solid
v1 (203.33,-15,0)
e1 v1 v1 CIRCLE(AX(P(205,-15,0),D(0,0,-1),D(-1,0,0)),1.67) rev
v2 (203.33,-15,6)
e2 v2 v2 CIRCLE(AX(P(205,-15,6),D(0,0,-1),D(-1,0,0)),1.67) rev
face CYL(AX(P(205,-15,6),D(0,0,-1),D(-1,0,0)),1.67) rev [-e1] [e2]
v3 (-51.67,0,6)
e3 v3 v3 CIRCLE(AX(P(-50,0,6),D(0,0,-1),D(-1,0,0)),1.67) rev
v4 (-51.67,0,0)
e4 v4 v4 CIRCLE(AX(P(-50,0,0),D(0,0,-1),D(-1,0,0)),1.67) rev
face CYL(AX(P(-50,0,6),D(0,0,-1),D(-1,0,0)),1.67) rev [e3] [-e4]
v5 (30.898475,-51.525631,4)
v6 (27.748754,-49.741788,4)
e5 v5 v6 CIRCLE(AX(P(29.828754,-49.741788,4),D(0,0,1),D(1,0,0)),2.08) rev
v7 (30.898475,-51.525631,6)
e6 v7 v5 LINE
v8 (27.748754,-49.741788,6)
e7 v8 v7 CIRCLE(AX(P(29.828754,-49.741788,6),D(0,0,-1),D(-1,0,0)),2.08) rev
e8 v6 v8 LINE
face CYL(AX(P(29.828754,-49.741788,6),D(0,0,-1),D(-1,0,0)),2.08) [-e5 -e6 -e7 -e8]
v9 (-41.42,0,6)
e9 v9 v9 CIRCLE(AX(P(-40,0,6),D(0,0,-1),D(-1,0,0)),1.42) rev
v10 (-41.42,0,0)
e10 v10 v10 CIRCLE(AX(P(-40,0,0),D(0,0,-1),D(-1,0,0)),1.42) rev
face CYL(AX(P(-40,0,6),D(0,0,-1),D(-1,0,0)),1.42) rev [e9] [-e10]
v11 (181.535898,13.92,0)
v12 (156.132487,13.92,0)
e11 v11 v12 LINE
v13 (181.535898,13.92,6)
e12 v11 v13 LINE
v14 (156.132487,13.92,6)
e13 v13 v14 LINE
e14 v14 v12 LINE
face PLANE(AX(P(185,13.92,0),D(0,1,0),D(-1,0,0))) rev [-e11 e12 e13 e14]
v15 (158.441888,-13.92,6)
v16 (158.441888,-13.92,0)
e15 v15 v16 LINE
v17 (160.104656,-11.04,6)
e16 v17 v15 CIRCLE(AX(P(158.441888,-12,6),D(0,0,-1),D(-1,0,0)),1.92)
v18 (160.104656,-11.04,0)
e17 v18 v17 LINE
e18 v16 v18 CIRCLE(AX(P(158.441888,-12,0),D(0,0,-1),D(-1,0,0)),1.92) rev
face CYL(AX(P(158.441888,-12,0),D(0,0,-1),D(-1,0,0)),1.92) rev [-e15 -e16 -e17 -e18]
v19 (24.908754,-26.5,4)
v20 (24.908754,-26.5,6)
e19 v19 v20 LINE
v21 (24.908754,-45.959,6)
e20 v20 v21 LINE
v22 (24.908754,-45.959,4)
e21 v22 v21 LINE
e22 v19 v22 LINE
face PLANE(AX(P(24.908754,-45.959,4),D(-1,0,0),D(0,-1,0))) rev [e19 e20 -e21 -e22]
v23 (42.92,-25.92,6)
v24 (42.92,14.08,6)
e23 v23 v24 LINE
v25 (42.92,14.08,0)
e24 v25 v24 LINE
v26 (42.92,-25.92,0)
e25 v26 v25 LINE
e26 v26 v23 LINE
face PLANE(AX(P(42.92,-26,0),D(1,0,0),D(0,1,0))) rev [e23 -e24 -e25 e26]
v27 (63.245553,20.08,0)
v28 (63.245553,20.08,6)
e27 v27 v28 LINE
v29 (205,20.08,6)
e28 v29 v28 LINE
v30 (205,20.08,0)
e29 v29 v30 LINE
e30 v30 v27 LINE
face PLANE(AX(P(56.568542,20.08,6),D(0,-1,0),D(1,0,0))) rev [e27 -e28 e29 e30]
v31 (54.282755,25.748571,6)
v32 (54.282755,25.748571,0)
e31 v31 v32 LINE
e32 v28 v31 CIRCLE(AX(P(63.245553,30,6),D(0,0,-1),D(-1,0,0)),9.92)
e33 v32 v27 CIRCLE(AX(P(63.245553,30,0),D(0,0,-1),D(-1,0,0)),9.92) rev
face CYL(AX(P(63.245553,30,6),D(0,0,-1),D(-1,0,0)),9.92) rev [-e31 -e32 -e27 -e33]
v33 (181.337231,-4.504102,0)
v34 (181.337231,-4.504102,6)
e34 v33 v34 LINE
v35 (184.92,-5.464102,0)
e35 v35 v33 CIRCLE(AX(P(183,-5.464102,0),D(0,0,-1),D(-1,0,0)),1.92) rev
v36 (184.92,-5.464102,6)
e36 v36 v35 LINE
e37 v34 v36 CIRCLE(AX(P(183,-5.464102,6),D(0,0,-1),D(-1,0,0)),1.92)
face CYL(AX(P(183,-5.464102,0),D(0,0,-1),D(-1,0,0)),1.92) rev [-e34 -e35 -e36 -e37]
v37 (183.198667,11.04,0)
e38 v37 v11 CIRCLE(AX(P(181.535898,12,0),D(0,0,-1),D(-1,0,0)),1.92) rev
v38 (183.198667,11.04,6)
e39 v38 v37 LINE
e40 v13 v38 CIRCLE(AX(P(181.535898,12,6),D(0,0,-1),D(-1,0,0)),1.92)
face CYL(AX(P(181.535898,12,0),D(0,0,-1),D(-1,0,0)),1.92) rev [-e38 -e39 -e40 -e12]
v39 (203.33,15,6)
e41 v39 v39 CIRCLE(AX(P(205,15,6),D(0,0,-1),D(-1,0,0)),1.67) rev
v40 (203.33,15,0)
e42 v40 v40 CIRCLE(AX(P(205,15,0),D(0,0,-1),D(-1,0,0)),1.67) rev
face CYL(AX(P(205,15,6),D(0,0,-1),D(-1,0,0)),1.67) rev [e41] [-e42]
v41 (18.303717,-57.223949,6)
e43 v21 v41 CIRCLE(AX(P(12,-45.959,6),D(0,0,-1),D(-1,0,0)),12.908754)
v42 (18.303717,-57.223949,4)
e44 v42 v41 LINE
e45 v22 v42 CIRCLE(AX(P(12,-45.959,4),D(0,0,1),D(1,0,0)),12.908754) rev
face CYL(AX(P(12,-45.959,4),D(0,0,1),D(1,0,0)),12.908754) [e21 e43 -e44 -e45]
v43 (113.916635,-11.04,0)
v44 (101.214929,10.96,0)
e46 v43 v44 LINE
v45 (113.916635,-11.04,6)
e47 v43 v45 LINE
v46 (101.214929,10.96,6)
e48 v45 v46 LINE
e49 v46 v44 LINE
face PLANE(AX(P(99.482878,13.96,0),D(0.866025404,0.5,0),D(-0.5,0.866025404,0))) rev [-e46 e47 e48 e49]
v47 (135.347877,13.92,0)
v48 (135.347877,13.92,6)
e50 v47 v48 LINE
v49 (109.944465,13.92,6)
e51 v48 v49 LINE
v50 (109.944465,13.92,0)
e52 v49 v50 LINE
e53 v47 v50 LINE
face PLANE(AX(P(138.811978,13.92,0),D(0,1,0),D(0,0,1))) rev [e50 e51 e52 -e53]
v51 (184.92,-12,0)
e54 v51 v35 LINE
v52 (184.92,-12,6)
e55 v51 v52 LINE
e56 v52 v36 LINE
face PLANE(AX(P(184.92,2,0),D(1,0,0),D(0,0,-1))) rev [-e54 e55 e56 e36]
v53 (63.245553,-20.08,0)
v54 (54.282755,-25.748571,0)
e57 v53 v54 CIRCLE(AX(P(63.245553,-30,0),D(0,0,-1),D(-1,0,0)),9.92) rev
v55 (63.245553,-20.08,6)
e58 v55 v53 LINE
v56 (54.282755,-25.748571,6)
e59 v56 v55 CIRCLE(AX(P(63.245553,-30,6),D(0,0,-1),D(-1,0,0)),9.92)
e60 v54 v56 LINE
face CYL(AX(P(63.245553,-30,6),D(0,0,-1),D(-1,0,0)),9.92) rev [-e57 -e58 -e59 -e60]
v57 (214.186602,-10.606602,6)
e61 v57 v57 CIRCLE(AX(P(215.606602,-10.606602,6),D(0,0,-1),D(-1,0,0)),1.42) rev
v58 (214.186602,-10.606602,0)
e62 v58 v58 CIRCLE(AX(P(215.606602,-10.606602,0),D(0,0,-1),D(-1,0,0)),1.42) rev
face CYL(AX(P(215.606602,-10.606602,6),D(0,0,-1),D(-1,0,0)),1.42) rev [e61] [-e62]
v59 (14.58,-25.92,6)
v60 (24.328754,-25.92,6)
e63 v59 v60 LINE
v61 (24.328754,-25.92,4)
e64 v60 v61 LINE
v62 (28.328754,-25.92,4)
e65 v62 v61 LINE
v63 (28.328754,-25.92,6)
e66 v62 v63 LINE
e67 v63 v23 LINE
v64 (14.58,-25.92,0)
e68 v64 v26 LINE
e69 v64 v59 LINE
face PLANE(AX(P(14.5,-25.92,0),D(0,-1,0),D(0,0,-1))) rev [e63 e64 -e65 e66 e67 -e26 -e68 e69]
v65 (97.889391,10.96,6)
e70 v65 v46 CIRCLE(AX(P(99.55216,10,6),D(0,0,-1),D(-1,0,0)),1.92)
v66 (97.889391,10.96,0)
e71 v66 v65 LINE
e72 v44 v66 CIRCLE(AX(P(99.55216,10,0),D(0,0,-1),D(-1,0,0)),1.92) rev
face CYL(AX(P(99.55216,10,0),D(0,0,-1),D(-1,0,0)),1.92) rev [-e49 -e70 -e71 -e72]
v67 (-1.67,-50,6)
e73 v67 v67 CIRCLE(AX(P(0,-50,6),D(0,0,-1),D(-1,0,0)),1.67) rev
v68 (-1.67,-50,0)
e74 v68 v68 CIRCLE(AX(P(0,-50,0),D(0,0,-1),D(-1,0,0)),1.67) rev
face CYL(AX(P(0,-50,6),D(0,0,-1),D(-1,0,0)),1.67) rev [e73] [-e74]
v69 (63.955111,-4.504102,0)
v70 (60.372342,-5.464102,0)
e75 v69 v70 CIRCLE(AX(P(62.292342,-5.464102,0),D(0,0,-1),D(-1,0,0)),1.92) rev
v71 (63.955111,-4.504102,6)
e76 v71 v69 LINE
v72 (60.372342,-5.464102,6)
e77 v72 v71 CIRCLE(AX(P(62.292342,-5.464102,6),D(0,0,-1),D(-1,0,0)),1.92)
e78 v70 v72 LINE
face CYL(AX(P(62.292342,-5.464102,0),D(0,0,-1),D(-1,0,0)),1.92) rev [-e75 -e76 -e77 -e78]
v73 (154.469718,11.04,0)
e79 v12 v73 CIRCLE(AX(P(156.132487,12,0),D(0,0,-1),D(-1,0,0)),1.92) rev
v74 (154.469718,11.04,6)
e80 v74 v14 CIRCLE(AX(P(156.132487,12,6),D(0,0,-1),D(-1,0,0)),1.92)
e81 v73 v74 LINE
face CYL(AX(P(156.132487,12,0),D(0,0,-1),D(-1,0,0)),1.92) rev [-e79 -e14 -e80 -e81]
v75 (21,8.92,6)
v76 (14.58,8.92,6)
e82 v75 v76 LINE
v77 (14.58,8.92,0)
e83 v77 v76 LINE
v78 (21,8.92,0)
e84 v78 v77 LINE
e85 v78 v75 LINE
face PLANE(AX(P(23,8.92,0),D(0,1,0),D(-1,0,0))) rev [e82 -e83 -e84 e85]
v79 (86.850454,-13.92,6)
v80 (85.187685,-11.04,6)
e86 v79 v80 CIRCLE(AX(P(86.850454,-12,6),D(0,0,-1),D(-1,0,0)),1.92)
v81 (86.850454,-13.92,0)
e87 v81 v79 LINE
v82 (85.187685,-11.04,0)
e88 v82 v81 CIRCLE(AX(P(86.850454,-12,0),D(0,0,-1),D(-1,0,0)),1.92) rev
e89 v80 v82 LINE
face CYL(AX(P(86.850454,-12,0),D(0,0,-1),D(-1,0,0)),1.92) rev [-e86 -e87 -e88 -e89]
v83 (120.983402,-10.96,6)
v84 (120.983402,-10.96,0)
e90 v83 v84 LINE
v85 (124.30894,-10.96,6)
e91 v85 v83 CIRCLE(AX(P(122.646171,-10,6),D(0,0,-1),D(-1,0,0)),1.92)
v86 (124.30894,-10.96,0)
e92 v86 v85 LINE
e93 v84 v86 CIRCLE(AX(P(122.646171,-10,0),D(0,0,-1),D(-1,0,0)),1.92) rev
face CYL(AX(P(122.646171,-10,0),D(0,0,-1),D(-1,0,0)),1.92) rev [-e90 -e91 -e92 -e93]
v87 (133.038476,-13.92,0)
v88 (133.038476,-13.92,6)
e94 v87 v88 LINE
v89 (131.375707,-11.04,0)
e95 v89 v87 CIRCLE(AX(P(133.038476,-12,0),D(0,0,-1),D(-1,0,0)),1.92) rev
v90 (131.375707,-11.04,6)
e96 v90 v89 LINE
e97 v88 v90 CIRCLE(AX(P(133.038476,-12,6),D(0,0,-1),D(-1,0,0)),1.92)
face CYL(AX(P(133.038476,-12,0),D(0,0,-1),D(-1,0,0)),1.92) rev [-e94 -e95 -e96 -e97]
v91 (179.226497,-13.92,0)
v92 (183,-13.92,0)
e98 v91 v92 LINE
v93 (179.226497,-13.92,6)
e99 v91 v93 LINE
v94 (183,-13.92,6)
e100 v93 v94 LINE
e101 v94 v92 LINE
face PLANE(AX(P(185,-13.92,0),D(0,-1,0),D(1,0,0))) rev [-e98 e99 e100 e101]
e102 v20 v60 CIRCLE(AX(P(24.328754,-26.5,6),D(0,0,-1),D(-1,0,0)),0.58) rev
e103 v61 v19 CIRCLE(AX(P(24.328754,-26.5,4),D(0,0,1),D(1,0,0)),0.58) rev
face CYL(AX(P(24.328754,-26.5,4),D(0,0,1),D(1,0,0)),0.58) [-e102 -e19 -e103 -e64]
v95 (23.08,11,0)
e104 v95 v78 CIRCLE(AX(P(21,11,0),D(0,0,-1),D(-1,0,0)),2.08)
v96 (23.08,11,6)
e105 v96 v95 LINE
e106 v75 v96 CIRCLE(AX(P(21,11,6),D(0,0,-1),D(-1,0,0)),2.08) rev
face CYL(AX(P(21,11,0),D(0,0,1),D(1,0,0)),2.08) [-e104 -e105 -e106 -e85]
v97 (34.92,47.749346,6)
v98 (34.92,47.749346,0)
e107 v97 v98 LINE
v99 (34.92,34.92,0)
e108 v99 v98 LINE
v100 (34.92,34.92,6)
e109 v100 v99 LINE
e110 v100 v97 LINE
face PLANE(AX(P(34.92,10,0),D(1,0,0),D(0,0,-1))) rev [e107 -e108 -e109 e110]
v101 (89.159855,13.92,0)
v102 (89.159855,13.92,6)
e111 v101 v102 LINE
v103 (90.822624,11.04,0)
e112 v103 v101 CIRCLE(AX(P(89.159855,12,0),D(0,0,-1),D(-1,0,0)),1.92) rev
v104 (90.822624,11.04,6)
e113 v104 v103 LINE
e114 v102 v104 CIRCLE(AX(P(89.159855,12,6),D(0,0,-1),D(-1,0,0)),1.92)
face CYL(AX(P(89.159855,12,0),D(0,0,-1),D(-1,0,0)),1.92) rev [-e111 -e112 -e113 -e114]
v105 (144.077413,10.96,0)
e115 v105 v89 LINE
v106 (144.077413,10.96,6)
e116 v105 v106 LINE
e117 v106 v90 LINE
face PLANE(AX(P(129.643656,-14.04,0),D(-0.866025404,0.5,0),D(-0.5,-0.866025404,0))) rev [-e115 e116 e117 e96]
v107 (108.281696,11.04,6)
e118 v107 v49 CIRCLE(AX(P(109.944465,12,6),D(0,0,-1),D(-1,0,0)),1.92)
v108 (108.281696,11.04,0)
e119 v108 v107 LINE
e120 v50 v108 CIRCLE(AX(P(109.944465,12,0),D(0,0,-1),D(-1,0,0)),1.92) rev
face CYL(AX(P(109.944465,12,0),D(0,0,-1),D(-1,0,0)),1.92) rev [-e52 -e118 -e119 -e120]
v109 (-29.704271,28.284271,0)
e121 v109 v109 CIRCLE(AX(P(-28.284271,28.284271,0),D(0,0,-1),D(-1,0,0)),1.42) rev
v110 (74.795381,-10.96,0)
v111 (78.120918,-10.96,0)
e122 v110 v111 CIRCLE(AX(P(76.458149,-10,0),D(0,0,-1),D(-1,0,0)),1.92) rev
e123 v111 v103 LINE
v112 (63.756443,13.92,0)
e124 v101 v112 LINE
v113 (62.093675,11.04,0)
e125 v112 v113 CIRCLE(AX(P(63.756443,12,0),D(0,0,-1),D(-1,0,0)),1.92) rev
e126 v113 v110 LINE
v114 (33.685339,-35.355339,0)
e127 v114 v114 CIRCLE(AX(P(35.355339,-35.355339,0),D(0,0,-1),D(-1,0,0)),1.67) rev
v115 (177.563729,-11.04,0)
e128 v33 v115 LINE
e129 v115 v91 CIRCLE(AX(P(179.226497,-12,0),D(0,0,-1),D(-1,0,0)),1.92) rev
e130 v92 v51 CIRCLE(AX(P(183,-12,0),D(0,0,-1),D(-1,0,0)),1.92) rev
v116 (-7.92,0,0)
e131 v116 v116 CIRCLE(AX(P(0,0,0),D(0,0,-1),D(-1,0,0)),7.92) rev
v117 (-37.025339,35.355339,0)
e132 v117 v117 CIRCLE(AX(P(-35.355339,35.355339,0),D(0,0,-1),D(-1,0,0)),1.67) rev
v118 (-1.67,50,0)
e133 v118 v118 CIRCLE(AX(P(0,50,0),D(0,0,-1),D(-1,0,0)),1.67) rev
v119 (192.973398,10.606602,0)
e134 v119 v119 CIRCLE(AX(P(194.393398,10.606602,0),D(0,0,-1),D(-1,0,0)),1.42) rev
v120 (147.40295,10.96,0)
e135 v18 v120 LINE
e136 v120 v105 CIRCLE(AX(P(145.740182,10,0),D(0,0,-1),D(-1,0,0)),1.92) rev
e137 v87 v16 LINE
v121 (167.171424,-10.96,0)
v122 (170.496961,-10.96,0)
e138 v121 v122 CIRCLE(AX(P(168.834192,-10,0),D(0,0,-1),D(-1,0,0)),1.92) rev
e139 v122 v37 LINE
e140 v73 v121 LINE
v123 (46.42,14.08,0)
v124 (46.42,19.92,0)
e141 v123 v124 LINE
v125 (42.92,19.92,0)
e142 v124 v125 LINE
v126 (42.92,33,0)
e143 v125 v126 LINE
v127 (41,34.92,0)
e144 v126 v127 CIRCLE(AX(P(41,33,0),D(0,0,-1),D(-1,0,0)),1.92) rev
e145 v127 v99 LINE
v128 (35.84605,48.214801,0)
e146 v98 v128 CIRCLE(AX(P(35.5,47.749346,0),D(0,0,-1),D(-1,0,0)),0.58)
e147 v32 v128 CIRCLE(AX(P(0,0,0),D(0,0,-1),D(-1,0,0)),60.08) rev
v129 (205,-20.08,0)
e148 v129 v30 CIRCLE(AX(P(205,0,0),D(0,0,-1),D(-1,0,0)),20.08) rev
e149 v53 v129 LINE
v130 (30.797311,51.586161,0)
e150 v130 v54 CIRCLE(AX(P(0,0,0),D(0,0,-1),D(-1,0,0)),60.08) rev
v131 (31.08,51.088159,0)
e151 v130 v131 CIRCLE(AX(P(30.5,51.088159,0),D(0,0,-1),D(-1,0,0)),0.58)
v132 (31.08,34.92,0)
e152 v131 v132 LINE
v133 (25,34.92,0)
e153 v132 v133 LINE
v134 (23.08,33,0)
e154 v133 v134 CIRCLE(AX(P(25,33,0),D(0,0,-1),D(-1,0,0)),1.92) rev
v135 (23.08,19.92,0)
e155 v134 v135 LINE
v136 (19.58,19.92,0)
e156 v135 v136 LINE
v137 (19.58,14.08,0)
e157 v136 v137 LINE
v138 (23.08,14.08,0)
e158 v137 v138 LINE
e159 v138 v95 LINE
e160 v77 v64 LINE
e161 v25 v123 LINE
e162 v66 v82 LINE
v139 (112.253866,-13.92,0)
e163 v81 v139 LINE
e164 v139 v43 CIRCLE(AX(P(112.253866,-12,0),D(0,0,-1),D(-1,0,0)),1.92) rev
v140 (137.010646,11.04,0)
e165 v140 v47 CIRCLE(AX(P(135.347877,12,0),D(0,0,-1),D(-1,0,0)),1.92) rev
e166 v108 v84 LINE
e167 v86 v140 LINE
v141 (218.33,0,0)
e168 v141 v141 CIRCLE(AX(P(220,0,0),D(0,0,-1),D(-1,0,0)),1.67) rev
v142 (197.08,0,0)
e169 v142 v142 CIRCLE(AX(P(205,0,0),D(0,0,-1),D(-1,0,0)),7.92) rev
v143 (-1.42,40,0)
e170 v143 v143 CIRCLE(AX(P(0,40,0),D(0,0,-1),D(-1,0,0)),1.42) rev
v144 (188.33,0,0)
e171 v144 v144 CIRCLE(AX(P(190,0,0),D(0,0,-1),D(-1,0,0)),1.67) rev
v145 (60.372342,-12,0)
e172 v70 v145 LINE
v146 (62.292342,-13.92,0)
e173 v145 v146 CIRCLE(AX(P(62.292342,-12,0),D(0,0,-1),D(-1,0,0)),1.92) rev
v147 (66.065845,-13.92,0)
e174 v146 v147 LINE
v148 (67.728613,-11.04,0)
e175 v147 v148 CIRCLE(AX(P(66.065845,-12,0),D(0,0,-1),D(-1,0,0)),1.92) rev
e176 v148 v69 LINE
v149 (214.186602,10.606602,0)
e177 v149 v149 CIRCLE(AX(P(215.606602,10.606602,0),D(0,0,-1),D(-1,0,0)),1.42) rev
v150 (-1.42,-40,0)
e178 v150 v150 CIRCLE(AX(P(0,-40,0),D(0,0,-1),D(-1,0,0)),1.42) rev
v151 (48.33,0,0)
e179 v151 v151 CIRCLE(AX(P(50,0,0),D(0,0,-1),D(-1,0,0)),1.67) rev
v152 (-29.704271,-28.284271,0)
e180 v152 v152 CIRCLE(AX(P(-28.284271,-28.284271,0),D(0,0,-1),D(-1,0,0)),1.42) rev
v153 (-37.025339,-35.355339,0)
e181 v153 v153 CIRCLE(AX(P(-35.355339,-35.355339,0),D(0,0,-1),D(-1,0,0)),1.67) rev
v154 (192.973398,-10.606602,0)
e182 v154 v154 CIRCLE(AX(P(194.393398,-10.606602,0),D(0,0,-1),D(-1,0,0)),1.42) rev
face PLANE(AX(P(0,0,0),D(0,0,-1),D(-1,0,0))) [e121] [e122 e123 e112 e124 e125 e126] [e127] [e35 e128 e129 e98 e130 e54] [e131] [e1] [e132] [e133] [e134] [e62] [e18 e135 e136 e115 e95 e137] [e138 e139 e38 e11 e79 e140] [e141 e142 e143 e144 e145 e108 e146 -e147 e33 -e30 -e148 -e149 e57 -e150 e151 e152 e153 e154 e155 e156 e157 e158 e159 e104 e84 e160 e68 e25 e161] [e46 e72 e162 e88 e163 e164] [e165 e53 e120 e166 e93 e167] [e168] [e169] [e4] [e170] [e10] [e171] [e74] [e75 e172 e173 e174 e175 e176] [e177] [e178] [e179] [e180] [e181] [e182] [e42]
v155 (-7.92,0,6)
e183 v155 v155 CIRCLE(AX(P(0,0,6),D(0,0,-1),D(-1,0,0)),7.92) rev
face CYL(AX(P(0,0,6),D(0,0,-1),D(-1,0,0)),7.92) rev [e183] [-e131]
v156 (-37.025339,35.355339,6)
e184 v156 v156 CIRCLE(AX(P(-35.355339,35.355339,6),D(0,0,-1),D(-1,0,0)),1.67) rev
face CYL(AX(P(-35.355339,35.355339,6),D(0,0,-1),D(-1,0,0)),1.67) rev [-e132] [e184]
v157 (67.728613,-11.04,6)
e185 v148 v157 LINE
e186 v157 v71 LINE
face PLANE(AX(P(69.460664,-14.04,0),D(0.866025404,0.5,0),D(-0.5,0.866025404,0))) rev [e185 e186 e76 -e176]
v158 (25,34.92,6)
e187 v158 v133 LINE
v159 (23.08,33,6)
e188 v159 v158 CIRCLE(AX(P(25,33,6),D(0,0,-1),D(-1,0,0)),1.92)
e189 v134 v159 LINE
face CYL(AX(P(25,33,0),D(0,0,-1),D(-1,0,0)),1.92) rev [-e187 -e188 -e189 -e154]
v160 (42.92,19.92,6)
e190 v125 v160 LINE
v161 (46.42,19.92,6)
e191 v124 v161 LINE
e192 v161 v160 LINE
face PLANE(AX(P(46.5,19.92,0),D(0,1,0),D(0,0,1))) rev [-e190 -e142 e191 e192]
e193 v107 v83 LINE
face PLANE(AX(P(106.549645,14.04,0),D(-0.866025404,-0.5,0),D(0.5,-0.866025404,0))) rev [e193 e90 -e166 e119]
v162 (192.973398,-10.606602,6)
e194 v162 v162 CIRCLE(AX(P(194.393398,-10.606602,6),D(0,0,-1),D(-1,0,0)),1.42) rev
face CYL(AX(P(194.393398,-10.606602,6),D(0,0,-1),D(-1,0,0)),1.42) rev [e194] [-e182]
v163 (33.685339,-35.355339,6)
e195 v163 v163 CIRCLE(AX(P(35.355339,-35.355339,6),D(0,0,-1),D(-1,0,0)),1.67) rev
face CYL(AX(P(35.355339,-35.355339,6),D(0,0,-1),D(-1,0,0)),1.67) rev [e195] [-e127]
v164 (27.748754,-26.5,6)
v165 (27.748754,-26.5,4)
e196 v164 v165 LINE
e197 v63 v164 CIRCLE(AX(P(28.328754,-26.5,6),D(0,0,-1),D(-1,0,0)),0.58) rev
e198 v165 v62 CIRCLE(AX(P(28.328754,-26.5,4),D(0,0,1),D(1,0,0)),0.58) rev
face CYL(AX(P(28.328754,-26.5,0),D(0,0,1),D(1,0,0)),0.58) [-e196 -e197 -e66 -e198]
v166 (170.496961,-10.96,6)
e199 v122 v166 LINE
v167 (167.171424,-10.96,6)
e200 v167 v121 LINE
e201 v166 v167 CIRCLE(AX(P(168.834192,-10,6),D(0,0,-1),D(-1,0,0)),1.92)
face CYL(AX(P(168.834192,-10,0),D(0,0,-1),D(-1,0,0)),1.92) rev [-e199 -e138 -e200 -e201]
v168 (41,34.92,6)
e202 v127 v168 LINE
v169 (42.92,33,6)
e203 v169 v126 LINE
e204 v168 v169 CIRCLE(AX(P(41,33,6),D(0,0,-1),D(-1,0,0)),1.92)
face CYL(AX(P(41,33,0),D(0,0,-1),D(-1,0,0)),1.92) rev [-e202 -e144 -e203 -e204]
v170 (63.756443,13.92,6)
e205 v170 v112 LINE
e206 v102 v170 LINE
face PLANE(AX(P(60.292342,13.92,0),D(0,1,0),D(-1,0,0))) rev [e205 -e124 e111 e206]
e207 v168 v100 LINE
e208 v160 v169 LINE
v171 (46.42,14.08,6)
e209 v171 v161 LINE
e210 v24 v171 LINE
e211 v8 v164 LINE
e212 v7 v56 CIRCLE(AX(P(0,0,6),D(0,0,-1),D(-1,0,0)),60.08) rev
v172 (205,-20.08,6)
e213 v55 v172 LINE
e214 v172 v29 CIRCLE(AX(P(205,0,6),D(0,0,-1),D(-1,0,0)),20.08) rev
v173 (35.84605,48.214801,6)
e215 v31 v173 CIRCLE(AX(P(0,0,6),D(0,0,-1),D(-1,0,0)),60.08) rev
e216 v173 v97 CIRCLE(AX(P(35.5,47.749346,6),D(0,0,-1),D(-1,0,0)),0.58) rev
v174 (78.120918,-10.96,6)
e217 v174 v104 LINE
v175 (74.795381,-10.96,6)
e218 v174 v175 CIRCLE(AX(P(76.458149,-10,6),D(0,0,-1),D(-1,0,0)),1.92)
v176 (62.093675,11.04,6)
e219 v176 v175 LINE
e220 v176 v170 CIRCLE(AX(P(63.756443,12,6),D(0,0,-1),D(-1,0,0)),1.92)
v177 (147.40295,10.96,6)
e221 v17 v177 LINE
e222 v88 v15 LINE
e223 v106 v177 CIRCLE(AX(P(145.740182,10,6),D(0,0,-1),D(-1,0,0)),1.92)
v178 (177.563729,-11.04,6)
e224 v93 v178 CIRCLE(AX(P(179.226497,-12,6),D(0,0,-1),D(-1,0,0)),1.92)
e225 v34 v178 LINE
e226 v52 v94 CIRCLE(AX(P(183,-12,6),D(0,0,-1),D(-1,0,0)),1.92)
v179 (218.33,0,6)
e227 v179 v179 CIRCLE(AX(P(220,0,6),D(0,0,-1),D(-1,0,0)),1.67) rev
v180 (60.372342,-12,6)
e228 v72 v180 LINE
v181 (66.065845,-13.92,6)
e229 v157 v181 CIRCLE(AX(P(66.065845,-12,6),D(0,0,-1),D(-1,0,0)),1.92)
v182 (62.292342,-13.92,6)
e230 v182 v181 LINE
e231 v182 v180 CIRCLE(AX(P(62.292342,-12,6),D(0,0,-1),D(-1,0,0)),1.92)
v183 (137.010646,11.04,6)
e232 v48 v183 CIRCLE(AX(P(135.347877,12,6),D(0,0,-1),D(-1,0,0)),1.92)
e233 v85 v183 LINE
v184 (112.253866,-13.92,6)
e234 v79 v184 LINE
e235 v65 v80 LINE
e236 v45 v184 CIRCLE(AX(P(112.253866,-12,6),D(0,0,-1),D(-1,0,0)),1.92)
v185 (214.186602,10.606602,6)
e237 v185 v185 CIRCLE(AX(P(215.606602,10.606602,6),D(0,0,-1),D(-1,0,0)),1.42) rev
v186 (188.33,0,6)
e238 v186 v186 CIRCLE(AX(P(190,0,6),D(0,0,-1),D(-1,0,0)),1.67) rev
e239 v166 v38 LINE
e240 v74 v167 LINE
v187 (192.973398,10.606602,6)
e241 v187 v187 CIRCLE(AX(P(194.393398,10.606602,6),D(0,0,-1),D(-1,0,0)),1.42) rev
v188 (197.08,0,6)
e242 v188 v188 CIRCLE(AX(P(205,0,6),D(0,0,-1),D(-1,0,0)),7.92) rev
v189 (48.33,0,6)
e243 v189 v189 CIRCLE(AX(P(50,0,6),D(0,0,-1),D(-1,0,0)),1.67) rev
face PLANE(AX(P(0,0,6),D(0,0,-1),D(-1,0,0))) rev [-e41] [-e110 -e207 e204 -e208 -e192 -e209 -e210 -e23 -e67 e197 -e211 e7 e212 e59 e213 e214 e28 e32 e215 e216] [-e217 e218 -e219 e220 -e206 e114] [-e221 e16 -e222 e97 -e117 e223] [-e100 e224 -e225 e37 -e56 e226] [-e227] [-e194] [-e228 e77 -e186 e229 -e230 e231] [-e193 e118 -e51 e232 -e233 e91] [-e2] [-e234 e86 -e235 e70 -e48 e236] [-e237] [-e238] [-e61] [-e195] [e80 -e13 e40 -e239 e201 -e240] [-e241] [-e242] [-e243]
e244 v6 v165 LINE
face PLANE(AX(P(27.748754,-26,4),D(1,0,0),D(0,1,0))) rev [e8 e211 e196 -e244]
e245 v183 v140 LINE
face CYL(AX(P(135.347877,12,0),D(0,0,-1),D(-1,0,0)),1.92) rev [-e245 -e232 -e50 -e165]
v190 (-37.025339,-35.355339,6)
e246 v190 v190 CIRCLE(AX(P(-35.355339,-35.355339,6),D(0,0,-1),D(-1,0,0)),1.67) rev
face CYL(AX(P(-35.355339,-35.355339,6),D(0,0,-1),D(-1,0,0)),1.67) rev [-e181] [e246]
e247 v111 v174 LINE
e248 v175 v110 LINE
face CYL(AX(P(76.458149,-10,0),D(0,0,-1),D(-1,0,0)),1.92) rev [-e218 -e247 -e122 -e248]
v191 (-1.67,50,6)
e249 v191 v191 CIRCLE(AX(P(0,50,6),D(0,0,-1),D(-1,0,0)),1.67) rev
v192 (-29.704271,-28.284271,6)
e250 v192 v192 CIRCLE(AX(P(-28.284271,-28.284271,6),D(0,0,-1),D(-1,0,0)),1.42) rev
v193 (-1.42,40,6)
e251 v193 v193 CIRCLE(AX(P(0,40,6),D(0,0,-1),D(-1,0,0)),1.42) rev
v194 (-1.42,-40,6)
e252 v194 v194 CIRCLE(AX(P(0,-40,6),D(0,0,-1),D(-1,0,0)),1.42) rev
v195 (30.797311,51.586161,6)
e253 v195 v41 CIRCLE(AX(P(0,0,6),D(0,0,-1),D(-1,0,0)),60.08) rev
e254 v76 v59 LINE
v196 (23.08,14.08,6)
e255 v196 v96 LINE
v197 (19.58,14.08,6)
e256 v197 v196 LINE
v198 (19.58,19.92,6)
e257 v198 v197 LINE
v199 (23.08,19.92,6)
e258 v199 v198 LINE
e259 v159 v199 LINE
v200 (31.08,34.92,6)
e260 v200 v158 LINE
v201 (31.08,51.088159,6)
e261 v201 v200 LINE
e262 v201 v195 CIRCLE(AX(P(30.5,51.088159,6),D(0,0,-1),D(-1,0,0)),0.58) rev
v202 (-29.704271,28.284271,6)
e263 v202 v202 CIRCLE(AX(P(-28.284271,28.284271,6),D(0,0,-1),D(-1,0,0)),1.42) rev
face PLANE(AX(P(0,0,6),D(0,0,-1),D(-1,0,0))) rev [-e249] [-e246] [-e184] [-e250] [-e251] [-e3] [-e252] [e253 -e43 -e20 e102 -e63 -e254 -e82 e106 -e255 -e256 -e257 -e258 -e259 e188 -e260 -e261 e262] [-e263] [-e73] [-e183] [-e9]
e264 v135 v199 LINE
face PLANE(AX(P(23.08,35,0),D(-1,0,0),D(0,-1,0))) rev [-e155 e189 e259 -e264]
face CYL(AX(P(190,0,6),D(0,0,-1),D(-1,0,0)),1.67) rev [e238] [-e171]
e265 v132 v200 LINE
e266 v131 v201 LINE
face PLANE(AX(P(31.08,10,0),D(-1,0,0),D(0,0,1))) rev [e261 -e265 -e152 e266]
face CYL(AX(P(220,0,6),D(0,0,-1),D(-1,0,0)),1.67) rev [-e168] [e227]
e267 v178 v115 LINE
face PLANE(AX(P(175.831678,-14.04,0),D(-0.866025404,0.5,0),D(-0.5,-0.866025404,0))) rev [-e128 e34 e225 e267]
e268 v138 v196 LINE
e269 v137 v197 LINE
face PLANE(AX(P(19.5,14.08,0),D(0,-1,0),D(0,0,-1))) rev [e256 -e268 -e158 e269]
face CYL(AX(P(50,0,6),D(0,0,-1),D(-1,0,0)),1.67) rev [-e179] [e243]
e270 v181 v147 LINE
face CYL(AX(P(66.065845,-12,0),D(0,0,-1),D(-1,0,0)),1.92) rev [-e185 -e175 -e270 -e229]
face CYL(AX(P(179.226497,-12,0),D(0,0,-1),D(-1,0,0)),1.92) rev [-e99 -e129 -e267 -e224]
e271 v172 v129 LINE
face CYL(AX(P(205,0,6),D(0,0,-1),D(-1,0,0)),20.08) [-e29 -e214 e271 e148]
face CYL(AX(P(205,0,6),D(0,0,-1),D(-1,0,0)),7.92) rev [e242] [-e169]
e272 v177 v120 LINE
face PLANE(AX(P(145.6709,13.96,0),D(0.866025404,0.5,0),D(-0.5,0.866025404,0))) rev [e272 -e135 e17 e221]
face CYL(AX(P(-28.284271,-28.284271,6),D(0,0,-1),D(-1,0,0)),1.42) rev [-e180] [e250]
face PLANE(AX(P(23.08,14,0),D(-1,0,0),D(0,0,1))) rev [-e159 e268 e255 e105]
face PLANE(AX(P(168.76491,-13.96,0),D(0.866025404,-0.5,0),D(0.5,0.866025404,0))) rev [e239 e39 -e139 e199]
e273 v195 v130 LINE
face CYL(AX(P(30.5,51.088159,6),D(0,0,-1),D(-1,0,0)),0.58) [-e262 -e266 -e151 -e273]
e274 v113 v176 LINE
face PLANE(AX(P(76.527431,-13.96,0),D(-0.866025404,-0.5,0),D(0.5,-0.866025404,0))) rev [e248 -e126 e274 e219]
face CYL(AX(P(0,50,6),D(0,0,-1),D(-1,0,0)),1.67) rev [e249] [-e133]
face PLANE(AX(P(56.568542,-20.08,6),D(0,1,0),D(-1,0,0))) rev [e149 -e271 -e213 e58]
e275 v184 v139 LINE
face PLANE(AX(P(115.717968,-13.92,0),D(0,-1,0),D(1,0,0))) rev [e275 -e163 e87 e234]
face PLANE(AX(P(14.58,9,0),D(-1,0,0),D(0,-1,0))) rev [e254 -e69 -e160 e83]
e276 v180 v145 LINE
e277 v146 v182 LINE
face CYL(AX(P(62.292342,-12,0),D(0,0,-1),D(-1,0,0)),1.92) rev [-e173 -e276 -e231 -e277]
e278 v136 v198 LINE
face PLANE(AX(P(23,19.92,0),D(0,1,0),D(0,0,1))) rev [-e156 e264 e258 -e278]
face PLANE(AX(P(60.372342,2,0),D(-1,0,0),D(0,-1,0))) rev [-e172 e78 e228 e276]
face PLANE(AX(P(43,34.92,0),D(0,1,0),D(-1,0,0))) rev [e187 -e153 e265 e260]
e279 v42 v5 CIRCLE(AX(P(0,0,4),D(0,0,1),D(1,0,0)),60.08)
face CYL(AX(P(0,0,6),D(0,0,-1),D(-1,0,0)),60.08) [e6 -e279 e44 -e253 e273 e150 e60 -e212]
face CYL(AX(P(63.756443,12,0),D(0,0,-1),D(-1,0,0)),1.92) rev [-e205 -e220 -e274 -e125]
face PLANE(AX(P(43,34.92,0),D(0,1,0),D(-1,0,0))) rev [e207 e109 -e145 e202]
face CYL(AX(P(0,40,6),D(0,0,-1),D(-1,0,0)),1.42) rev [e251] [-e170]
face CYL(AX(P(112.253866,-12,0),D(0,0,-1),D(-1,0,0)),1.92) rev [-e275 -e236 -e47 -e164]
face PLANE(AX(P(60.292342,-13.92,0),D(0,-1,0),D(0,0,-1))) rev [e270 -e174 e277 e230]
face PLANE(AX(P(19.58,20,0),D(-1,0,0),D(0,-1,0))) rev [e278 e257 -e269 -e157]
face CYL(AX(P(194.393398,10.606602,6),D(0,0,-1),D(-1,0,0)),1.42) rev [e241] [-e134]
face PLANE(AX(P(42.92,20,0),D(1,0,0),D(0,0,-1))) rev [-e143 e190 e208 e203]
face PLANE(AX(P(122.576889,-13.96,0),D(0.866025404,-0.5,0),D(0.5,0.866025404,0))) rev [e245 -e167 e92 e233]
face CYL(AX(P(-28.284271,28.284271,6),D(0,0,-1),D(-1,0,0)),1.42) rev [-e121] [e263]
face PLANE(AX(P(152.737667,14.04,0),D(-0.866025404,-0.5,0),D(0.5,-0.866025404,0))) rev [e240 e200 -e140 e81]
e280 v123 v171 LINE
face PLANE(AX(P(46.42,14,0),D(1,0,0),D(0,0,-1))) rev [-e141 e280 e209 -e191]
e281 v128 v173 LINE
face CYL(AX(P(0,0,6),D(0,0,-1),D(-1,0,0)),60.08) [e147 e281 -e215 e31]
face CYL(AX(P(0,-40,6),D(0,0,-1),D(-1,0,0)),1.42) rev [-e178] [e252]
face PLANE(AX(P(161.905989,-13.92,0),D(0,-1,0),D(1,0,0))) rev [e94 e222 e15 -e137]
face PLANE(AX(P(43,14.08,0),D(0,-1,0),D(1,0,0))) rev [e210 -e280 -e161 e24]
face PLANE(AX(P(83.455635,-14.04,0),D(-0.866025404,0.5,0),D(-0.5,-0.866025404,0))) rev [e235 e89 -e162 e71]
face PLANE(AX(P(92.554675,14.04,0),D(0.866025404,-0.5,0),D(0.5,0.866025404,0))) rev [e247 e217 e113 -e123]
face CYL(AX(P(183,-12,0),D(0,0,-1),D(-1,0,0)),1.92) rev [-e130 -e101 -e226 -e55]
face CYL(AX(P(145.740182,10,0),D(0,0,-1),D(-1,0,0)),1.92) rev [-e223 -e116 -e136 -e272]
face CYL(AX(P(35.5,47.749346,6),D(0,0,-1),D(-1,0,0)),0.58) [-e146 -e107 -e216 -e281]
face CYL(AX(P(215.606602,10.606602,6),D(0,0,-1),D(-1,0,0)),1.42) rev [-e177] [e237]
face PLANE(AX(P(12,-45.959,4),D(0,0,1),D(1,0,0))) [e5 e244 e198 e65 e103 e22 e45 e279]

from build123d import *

# Parameters (mm, degrees)
SKETCH1_R              = 8
SKETCH1_R_2            = 1.75
SKETCH1_R_3            = 1.5
BOSS_EXTRUDE1_DEPTH    = 6
CUT_EXTRUDE2_DEPTH     = 233.939906414
CUT_EXTRUDE3_DEPTH     = 2
FILLET2_R              = 2
FILLET3_R              = 0.5
FILLET4_R              = 10
FILLET6_R              = 2
CUT_EXTRUDE5_DEPTH     = 233.939906414
FILLET7_R              = 2
SKETCH7_W              = 4
SKETCH7_H              = 50
CUT_EXTRUDE6_DEPTH     = 233.939906414
FILLET8_R              = 0.5
MOVE_FACE1_OUTLINE_R   = 8
MOVE_FACE1_OUTLINE_R_2 = 7.92
MOVE_FACE1_OUTLINE_R_3 = 1.75
MOVE_FACE1_OUTLINE_R_4 = 1.67
MOVE_FACE1_OUTLINE_R_5 = 1.5
MOVE_FACE1_OUTLINE_R_6 = 1.42
MOVE_FACE1_DEPTH       = 6
MOVE_FACE1_2_DEPTH     = 4


# Read off the part's stored shape, not the designer's step: Move Face1
with BuildPart() as part:
    # Sketch1 → Boss-Extrude1 (new body)
    with BuildSketch(Plane.XY):
        with BuildLine():
            Line((56.568542495, -20), (205, -20))
            ThreePointArc((205, -20), (225, 0), (205, 20))
            Line((205, 20), (56.568542495, 20))
            ThreePointArc((56.568542495, 20), (-60, 0), (56.568542495, -20))
        make_face()
        Circle(SKETCH1_R, mode=Mode.SUBTRACT)
        with Locations((205, 0)):
            Circle(SKETCH1_R, mode=Mode.SUBTRACT)
        with Locations((205, -15)):
            Circle(SKETCH1_R_2, mode=Mode.SUBTRACT)
        with Locations((215.606601718, -10.606601718)):
            Circle(SKETCH1_R_3, mode=Mode.SUBTRACT)
        with Locations((190, 0)):
            Circle(SKETCH1_R_2, mode=Mode.SUBTRACT)
        with Locations((194.393398282, -10.606601718)):
            Circle(SKETCH1_R_3, mode=Mode.SUBTRACT)
        with Locations((205, 15)):
            Circle(SKETCH1_R_2, mode=Mode.SUBTRACT)
        with Locations((194.393398282, 10.606601718)):
            Circle(SKETCH1_R_3, mode=Mode.SUBTRACT)
        with Locations((220, 0)):
            Circle(SKETCH1_R_2, mode=Mode.SUBTRACT)
        with Locations((215.606601718, 10.606601718)):
            Circle(SKETCH1_R_3, mode=Mode.SUBTRACT)
        with Locations((0, -40)):
            Circle(SKETCH1_R_3, mode=Mode.SUBTRACT)
        with Locations((0, -50)):
            Circle(SKETCH1_R_2, mode=Mode.SUBTRACT)
        with Locations((-28.284271247, -28.284271247)):
            Circle(SKETCH1_R_3, mode=Mode.SUBTRACT)
        with Locations((-35.355339059, -35.355339059)):
            Circle(SKETCH1_R_2, mode=Mode.SUBTRACT)
        with Locations((-40, 0)):
            Circle(SKETCH1_R_3, mode=Mode.SUBTRACT)
        with Locations((-50, 0)):
            Circle(SKETCH1_R_2, mode=Mode.SUBTRACT)
        with Locations((-28.284271247, 28.284271247)):
            Circle(SKETCH1_R_3, mode=Mode.SUBTRACT)
        with Locations((-35.355339059, 35.355339059)):
            Circle(SKETCH1_R_2, mode=Mode.SUBTRACT)
        with Locations((0, 40)):
            Circle(SKETCH1_R_3, mode=Mode.SUBTRACT)
        with Locations((0, 50)):
            Circle(SKETCH1_R_2, mode=Mode.SUBTRACT)
        with Locations((50, 0)):
            Circle(SKETCH1_R_2, mode=Mode.SUBTRACT)
        with Locations((35.355339059, -35.355339059)):
            Circle(SKETCH1_R_2, mode=Mode.SUBTRACT)
    extrude(amount=BOSS_EXTRUDE1_DEPTH)

    # Sketch3 → Cut-Extrude2 (cut, through all)
    with BuildSketch(Plane.XY.offset(6)):
        Polygon((14.5, -26), (43, -26), (43, 14), (46.5, 14), (46.5, 20), (43, 20), (43, 35), (23, 35), (23, 20), (19.5, 20), (19.5, 14), (23, 14), (23, 9), (14.5, 9), align=None)
    extrude(amount=-CUT_EXTRUDE2_DEPTH, mode=Mode.SUBTRACT)

    # Sketch4 → Cut-Extrude3 (cut)
    with BuildSketch(Plane.XY.offset(6)):
        with BuildLine():
            Line((24.828753827, -45.959), (24.828753827, -26))
            Line((24.828753827, -26), (27.828753827, -26))
            Line((27.828753827, -26), (27.828753827, -58.787753827))
            Line((27.828753827, -58.787753827), (12, -58.787753827))
            ThreePointArc((12, -58.787753827), (21.071298825, -55.030298825), (24.828753827, -45.959))
        make_face()
    extrude(amount=-CUT_EXTRUDE3_DEPTH, mode=Mode.SUBTRACT)

    # Fillet2
    fillet2_edges = [part.edges().sort_by_distance(p)[0] for p in [
        (27.828753827, -53.156001171, 5),
    ]]
    fillet(fillet2_edges, radius=FILLET2_R)

    # Fillet3
    fillet3_edges = [part.edges().sort_by_distance(p)[0] for p in [
        (27.828753827, -26, 5),
        (24.828753827, -26, 5),
    ]]
    fillet(fillet3_edges, radius=FILLET3_R)

    # Fillet4
    fillet4_edges = [part.edges().sort_by_distance(p)[0] for p in [
        (56.568542495, 20, 3),
        (56.568542495, -20, 3),
    ]]
    fillet(fillet4_edges, radius=FILLET4_R)

    # Fillet6
    fillet6_edges = [part.edges().sort_by_distance(p)[0] for p in [
        (23, 9, 3),
        (23, 35, 3),
        (43, 35, 3),
    ]]
    fillet(fillet6_edges, radius=FILLET6_R)

    # Sketch6 → Cut-Extrude5 (cut, through all)
    with BuildSketch(Plane.XY.offset(6)):
        Polygon((60.292341855, 14), (92.62395693, 14), (76.458149392, -14), align=None)
        Polygon((83.386352623, -14), (99.55216016, 14), (115.717967697, -14), align=None)
        Polygon((106.48036339, 14), (122.646170928, -14), (138.811978465, 14), align=None)
        Polygon((129.574374158, -14), (145.740181695, 14), (161.905989232, -14), align=None)
        Polygon((152.668384925, 14), (168.834192463, -14), (185, 14), align=None)
        Polygon((60.292341855, 2), (60.292341855, -14), (69.529946162, -14), align=None)
        Polygon((185, 2), (185, -14), (175.762395693, -14), align=None)
    extrude(amount=-CUT_EXTRUDE5_DEPTH, mode=Mode.SUBTRACT)

    # Fillet7
    fillet7_edges = [part.edges().sort_by_distance(p)[0] for p in [
        (76.458149392, -14, 3),
        (60.292341855, 14, 3),
        (92.62395693, 14, 3),
        (115.717967697, -14, 3),
        (83.386352623, -14, 3),
        (99.55216016, 14, 3),
        (106.48036339, 14, 3),
        (138.811978465, 14, 3),
        (122.646170928, -14, 3),
        (161.905989232, -14, 3),
        (129.574374158, -14, 3),
        (145.740181695, 14, 3),
        (152.668384925, 14, 3),
        (185, 14, 3),
        (168.834192463, -14, 3),
        (60.292341855, 2, 3),
        (69.529946162, -14, 3),
        (60.292341855, -14, 3),
        (175.762395693, -14, 3),
        (185, 2, 3),
        (185, -14, 3),
    ]]
    fillet(fillet7_edges, radius=FILLET7_R)

    # Sketch7 → Cut-Extrude6 (cut, through all)
    with BuildSketch(Plane.XY.offset(6)):
        with Locations((33, 35)):
            Rectangle(SKETCH7_W, SKETCH7_H)
    extrude(amount=-CUT_EXTRUDE6_DEPTH, mode=Mode.SUBTRACT)

    # Fillet8
    fillet8_edges = [part.edges().sort_by_distance(p)[0] for p in [
        (35, 48.733971724, 3),
        (31, 51.371198156, 3),
    ]]
    fillet(fillet8_edges, radius=FILLET8_R)

    # Move Face1 outline → Move Face1 (add)
    # profile 1 of 31: a face of its own
    with BuildSketch(Plane.XY):
        with BuildLine():
            ThreePointArc((54.282754807, 25.748571429), (46.443333802, 38.113293552), (35.84605042, 48.214801351))
            ThreePointArc((35.84605042, 48.214801351), (35.239528546, 48.267568105), (34.92, 47.749345545))
            Line((34.92, 47.749345545), (34.92, 34.92))
            Line((34.92, 34.92), (41, 34.92))
            ThreePointArc((41, 34.92), (42.35764502, 34.35764502), (42.92, 33))
            Line((42.92, 33), (42.92, 19.92))
            Line((42.92, 19.92), (46.42, 19.92))
            Line((46.42, 19.92), (46.42, 14.08))
            Line((46.42, 14.08), (42.92, 14.08))
            Line((42.92, 14.08), (42.92, -25.92))
            Line((42.92, -25.92), (28.328753827, -25.92))
            ThreePointArc((28.328753827, -25.92), (27.918631894, -26.089878067), (27.748753827, -26.5))
            Line((27.748753827, -26.5), (27.748753827, -49.741787716))
            ThreePointArc((27.748753827, -49.741787716), (28.803721954, -51.551679884), (30.898474654, -51.525631137))
            ThreePointArc((30.898474654, -51.525631137), (44.4980299, -40.367458864), (54.282754807, -25.748571429))
            ThreePointArc((54.282754807, -25.748571429), (57.943090164, -21.616069793), (63.245553203, -20.08))
            Line((63.245553203, -20.08), (205, -20.08))
            ThreePointArc((205, -20.08), (225.08, 0), (205, 20.08))
            Line((205, 20.08), (63.245553203, 20.08))
            ThreePointArc((63.245553203, 20.08), (57.943090164, 21.616069793), (54.282754807, 25.748571429))
        make_face()
        with BuildLine():
            ThreePointArc((54.210474174, -25.714285714), (44.438778194, -40.313707254), (30.857331545, -51.457021774))
            ThreePointArc((30.857331545, -51.457021774), (28.843146257, -51.482068646), (27.828753827, -49.741787716))
            Line((27.828753827, -49.741787716), (27.828753827, -26.5))
            ThreePointArc((27.828753827, -26.5), (27.975200436, -26.146446609), (28.328753827, -26))
            Line((28.328753827, -26), (43, -26))
            Line((43, -26), (43, 14))
            Line((43, 14), (46.5, 14))
            Line((46.5, 14), (46.5, 20))
            Line((46.5, 20), (43, 20))
            Line((43, 20), (43, 33))
            ThreePointArc((43, 33), (42.414213562, 34.414213562), (41, 35))
            Line((41, 35), (35, 35))
            Line((35, 35), (35, 47.749345545))
            ThreePointArc((35, 47.749345545), (35.275455643, 48.196089132), (35.798319328, 48.15060055))
            ThreePointArc((35.798319328, 48.15060055), (46.381491813, 38.062543494), (54.210474174, 25.714285714))
            ThreePointArc((54.210474174, 25.714285714), (57.900328365, 21.548457453), (63.245553203, 20))
            Line((63.245553203, 20), (205, 20))
            ThreePointArc((205, 20), (225, 0), (205, -20))
            Line((205, -20), (63.245553203, -20))
            ThreePointArc((63.245553203, -20), (57.900328365, -21.548457453), (54.210474174, -25.714285714))
        make_face(mode=Mode.SUBTRACT)
    # profile 2 of 31: a face of its own
    with BuildSketch(Plane.XY):
        with BuildLine():
            ThreePointArc((30.797310924, 51.586161321), (-59.687835994, 6.853366641), (18.303717078, -57.223949018))
            ThreePointArc((18.303717078, -57.223949018), (23.135732067, -52.488272295), (24.908753827, -45.959))
            Line((24.908753827, -45.959), (24.908753827, -26.5))
            ThreePointArc((24.908753827, -26.5), (24.73887576, -26.089878067), (24.328753827, -25.92))
            Line((24.328753827, -25.92), (14.58, -25.92))
            Line((14.58, -25.92), (14.58, 8.92))
            Line((14.58, 8.92), (21, 8.92))
            ThreePointArc((21, 8.92), (22.470782105, 9.529217895), (23.08, 11))
            Line((23.08, 11), (23.08, 14.08))
            Line((23.08, 14.08), (19.58, 14.08))
            Line((19.58, 14.08), (19.58, 19.92))
            Line((19.58, 19.92), (23.08, 19.92))
            Line((23.08, 19.92), (23.08, 33))
            ThreePointArc((23.08, 33), (23.64235498, 34.35764502), (25, 34.92))
            Line((25, 34.92), (31.08, 34.92))
            Line((31.08, 34.92), (31.08, 51.088159098))
            ThreePointArc((31.08, 51.088159098), (31.004400801, 51.374480302), (30.797310924, 51.586161321))
        make_face()
        with BuildLine():
            Line((14.5, -26), (24.328753827, -26))
            ThreePointArc((24.328753827, -26), (24.682307218, -26.146446609), (24.828753827, -26.5))
            Line((24.828753827, -26.5), (24.828753827, -45.959))
            ThreePointArc((24.828753827, -45.959), (23.06875318, -52.444339451), (18.271666777, -57.150207289))
            ThreePointArc((18.271666777, -57.150207289), (-59.607898294, 6.848245099), (30.756302521, 51.517471359))
            ThreePointArc((30.756302521, 51.517471359), (30.934828277, 51.334987722), (31, 51.088159098))
            Line((31, 51.088159098), (31, 35))
            Line((31, 35), (25, 35))
            ThreePointArc((25, 35), (23.585786438, 34.414213562), (23, 33))
            Line((23, 33), (23, 20))
            Line((23, 20), (19.5, 20))
            Line((19.5, 20), (19.5, 14))
            Line((19.5, 14), (23, 14))
            Line((23, 14), (23, 11))
            ThreePointArc((23, 11), (22.414213562, 9.585786438), (21, 9))
            Line((21, 9), (14.5, 9))
            Line((14.5, 9), (14.5, -26))
        make_face(mode=Mode.SUBTRACT)
    # profile 3 of 31: a face of its own
    with BuildSketch(Plane.XY):
        Circle(MOVE_FACE1_OUTLINE_R)
        Circle(MOVE_FACE1_OUTLINE_R_2, mode=Mode.SUBTRACT)
    # profile 4 of 31: a face of its own
    with BuildSketch(Plane.XY):
        with Locations((205, 0)):
            Circle(MOVE_FACE1_OUTLINE_R)
        with Locations((205, 0)):
            Circle(MOVE_FACE1_OUTLINE_R_2, mode=Mode.SUBTRACT)
    # profile 5 of 31: a face of its own
    with BuildSketch(Plane.XY):
        with Locations((205, -15)):
            Circle(MOVE_FACE1_OUTLINE_R_3)
        with Locations((205, -15)):
            Circle(MOVE_FACE1_OUTLINE_R_4, mode=Mode.SUBTRACT)
    # profile 6 of 31: a face of its own
    with BuildSketch(Plane.XY):
        with Locations((215.606601718, -10.606601718)):
            Circle(MOVE_FACE1_OUTLINE_R_5)
        with Locations((215.606601718, -10.606601718)):
            Circle(MOVE_FACE1_OUTLINE_R_6, mode=Mode.SUBTRACT)
    # profile 7 of 31: a face of its own
    with BuildSketch(Plane.XY):
        with Locations((190, 0)):
            Circle(MOVE_FACE1_OUTLINE_R_3)
        with Locations((190, 0)):
            Circle(MOVE_FACE1_OUTLINE_R_4, mode=Mode.SUBTRACT)
    # profile 8 of 31: a face of its own
    with BuildSketch(Plane.XY):
        with Locations((194.393398282, -10.606601718)):
            Circle(MOVE_FACE1_OUTLINE_R_5)
        with Locations((194.393398282, -10.606601718)):
            Circle(MOVE_FACE1_OUTLINE_R_6, mode=Mode.SUBTRACT)
    # profile 9 of 31: a face of its own
    with BuildSketch(Plane.XY):
        with Locations((205, 15)):
            Circle(MOVE_FACE1_OUTLINE_R_3)
        with Locations((205, 15)):
            Circle(MOVE_FACE1_OUTLINE_R_4, mode=Mode.SUBTRACT)
    # profile 10 of 31: a face of its own
    with BuildSketch(Plane.XY):
        with Locations((194.393398282, 10.606601718)):
            Circle(MOVE_FACE1_OUTLINE_R_5)
        with Locations((194.393398282, 10.606601718)):
            Circle(MOVE_FACE1_OUTLINE_R_6, mode=Mode.SUBTRACT)
    # profile 11 of 31: a face of its own
    with BuildSketch(Plane.XY):
        with Locations((220, 0)):
            Circle(MOVE_FACE1_OUTLINE_R_3)
        with Locations((220, 0)):
            Circle(MOVE_FACE1_OUTLINE_R_4, mode=Mode.SUBTRACT)
    # profile 12 of 31: a face of its own
    with BuildSketch(Plane.XY):
        with Locations((215.606601718, 10.606601718)):
            Circle(MOVE_FACE1_OUTLINE_R_5)
        with Locations((215.606601718, 10.606601718)):
            Circle(MOVE_FACE1_OUTLINE_R_6, mode=Mode.SUBTRACT)
    # profile 13 of 31: a face of its own
    with BuildSketch(Plane.XY):
        with Locations((0, -40)):
            Circle(MOVE_FACE1_OUTLINE_R_5)
        with Locations((0, -40)):
            Circle(MOVE_FACE1_OUTLINE_R_6, mode=Mode.SUBTRACT)
    # profile 14 of 31: a face of its own
    with BuildSketch(Plane.XY):
        with Locations((0, -50)):
            Circle(MOVE_FACE1_OUTLINE_R_3)
        with Locations((0, -50)):
            Circle(MOVE_FACE1_OUTLINE_R_4, mode=Mode.SUBTRACT)
    # profile 15 of 31: a face of its own
    with BuildSketch(Plane.XY):
        with Locations((-28.284271247, -28.284271247)):
            Circle(MOVE_FACE1_OUTLINE_R_5)
        with Locations((-28.284271247, -28.284271247)):
            Circle(MOVE_FACE1_OUTLINE_R_6, mode=Mode.SUBTRACT)
    # profile 16 of 31: a face of its own
    with BuildSketch(Plane.XY):
        with Locations((-35.355339059, -35.355339059)):
            Circle(MOVE_FACE1_OUTLINE_R_3)
        with Locations((-35.355339059, -35.355339059)):
            Circle(MOVE_FACE1_OUTLINE_R_4, mode=Mode.SUBTRACT)
    # profile 17 of 31: a face of its own
    with BuildSketch(Plane.XY):
        with Locations((-40, 0)):
            Circle(MOVE_FACE1_OUTLINE_R_5)
        with Locations((-40, 0)):
            Circle(MOVE_FACE1_OUTLINE_R_6, mode=Mode.SUBTRACT)
    # profile 18 of 31: a face of its own
    with BuildSketch(Plane.XY):
        with Locations((-50, 0)):
            Circle(MOVE_FACE1_OUTLINE_R_3)
        with Locations((-50, 0)):
            Circle(MOVE_FACE1_OUTLINE_R_4, mode=Mode.SUBTRACT)
    # profile 19 of 31: a face of its own
    with BuildSketch(Plane.XY):
        with Locations((-28.284271247, 28.284271247)):
            Circle(MOVE_FACE1_OUTLINE_R_5)
        with Locations((-28.284271247, 28.284271247)):
            Circle(MOVE_FACE1_OUTLINE_R_6, mode=Mode.SUBTRACT)
    # profile 20 of 31: a face of its own
    with BuildSketch(Plane.XY):
        with Locations((-35.355339059, 35.355339059)):
            Circle(MOVE_FACE1_OUTLINE_R_3)
        with Locations((-35.355339059, 35.355339059)):
            Circle(MOVE_FACE1_OUTLINE_R_4, mode=Mode.SUBTRACT)
    # profile 21 of 31: a face of its own
    with BuildSketch(Plane.XY):
        with Locations((0, 40)):
            Circle(MOVE_FACE1_OUTLINE_R_5)
        with Locations((0, 40)):
            Circle(MOVE_FACE1_OUTLINE_R_6, mode=Mode.SUBTRACT)
    # profile 22 of 31: a face of its own
    with BuildSketch(Plane.XY):
        with Locations((0, 50)):
            Circle(MOVE_FACE1_OUTLINE_R_3)
        with Locations((0, 50)):
            Circle(MOVE_FACE1_OUTLINE_R_4, mode=Mode.SUBTRACT)
    # profile 23 of 31: a face of its own
    with BuildSketch(Plane.XY):
        with Locations((50, 0)):
            Circle(MOVE_FACE1_OUTLINE_R_3)
        with Locations((50, 0)):
            Circle(MOVE_FACE1_OUTLINE_R_4, mode=Mode.SUBTRACT)
    # profile 24 of 31: a face of its own
    with BuildSketch(Plane.XY):
        with Locations((35.355339059, -35.355339059)):
            Circle(MOVE_FACE1_OUTLINE_R_3)
        with Locations((35.355339059, -35.355339059)):
            Circle(MOVE_FACE1_OUTLINE_R_4, mode=Mode.SUBTRACT)
    # profile 25 of 31: a face of its own
    with BuildSketch(Plane.XY):
        with BuildLine():
            ThreePointArc((63.75644347, 14), (62.024392663, 13), (62.024392663, 11))
            Line((62.024392663, 11), (74.726098585, -11))
            ThreePointArc((74.726098585, -11), (76.458149392, -12), (78.1902002, -11))
            Line((78.1902002, -11), (90.891906122, 11))
            ThreePointArc((90.891906122, 11), (90.891906122, 13), (89.159855315, 14))
            Line((89.159855315, 14), (63.75644347, 14))
        make_face()
        with BuildLine():
            Line((74.795380617, -10.96), (62.093674695, 11.04))
            ThreePointArc((62.093674695, 11.04), (62.093674695, 12.96), (63.75644347, 13.92))
            Line((63.75644347, 13.92), (89.159855315, 13.92))
            ThreePointArc((89.159855315, 13.92), (90.82262409, 12.96), (90.82262409, 11.04))
            Line((90.82262409, 11.04), (78.120918168, -10.96))
            ThreePointArc((78.120918168, -10.96), (76.458149393, -11.92), (74.795380617, -10.96))
        make_face(mode=Mode.SUBTRACT)
    # profile 26 of 31: a face of its own
    with BuildSketch(Plane.XY):
        with BuildLine():
            ThreePointArc((137.079927657, 11), (137.079927657, 13), (135.34787685, 14))
            Line((135.34787685, 14), (109.944465005, 14))
            ThreePointArc((109.944465005, 14), (108.212414198, 13), (108.212414198, 11))
            Line((108.212414198, 11), (120.91412012, -11))
            ThreePointArc((120.91412012, -11), (122.646170928, -12), (124.378221735, -11))
            Line((124.378221735, -11), (137.079927657, 11))
        make_face()
        with BuildLine():
            Line((109.944465005, 13.92), (135.34787685, 13.92))
            ThreePointArc((135.34787685, 13.92), (137.010645625, 12.96), (137.010645625, 11.04))
            Line((137.010645625, 11.04), (124.308939703, -10.96))
            ThreePointArc((124.308939703, -10.96), (122.646170927, -11.92), (120.983402152, -10.96))
            Line((120.983402152, -10.96), (108.28169623, 11.04))
            ThreePointArc((108.28169623, 11.04), (108.28169623, 12.96), (109.944465005, 13.92))
        make_face(mode=Mode.SUBTRACT)
    # profile 27 of 31: a face of its own
    with BuildSketch(Plane.XY):
        with BuildLine():
            ThreePointArc((183.267949192, 11), (183.267949192, 13), (181.535898385, 14))
            Line((181.535898385, 14), (156.132486541, 14))
            ThreePointArc((156.132486541, 14), (154.400435733, 13), (154.400435733, 11))
            Line((154.400435733, 11), (167.102141655, -11))
            ThreePointArc((167.102141655, -11), (168.834192462, -12), (170.56624327, -11))
            Line((170.56624327, -11), (183.267949192, 11))
        make_face()
        with BuildLine():
            Line((156.132486541, 13.92), (181.535898385, 13.92))
            ThreePointArc((181.535898385, 13.92), (183.19866716, 12.96), (183.19866716, 11.04))
            Line((183.19866716, 11.04), (170.496961238, -10.96))
            ThreePointArc((170.496961238, -10.96), (168.834192462, -11.92), (167.171423687, -10.96))
            Line((167.171423687, -10.96), (154.469717765, 11.04))
            ThreePointArc((154.469717765, 11.04), (154.469717765, 12.96), (156.132486541, 13.92))
        make_face(mode=Mode.SUBTRACT)
    # profile 28 of 31: a face of its own
    with BuildSketch(Plane.XY):
        with BuildLine():
            ThreePointArc((85.11840343, -11), (85.11840343, -13), (86.850454238, -14))
            Line((86.850454238, -14), (112.253866082, -14))
            ThreePointArc((112.253866082, -14), (113.98591689, -13), (113.98591689, -11))
            Line((113.98591689, -11), (101.284210968, 11))
            ThreePointArc((101.284210968, 11), (99.55216016, 12), (97.820109352, 11))
            Line((97.820109352, 11), (85.11840343, -11))
        make_face()
        with BuildLine():
            Line((112.253866082, -13.92), (86.850454238, -13.92))
            ThreePointArc((86.850454238, -13.92), (85.187685462, -12.96), (85.187685462, -11.04))
            Line((85.187685462, -11.04), (97.889391385, 10.96))
            ThreePointArc((97.889391385, 10.96), (99.55216016, 11.92), (101.214928935, 10.96))
            Line((101.214928935, 10.96), (113.916634857, -11.04))
            ThreePointArc((113.916634857, -11.04), (113.916634857, -12.96), (112.253866082, -13.92))
        make_face(mode=Mode.SUBTRACT)
    # profile 29 of 31: a face of its own
    with BuildSketch(Plane.XY):
        with BuildLine():
            ThreePointArc((131.306424965, -11), (131.306424965, -13), (133.038475773, -14))
            Line((133.038475773, -14), (158.441887617, -14))
            ThreePointArc((158.441887617, -14), (160.173938425, -13), (160.173938425, -11))
            Line((160.173938425, -11), (147.472232503, 11))
            ThreePointArc((147.472232503, 11), (145.740181696, 12), (144.008130888, 11))
            Line((144.008130888, 11), (131.306424965, -11))
        make_face()
        with BuildLine():
            Line((158.441887617, -13.92), (133.038475773, -13.92))
            ThreePointArc((133.038475773, -13.92), (131.375706998, -12.96), (131.375706998, -11.04))
            Line((131.375706998, -11.04), (144.07741292, 10.96))
            ThreePointArc((144.07741292, 10.96), (145.740181695, 11.92), (147.40295047, 10.96))
            Line((147.40295047, 10.96), (160.104656393, -11.04))
            ThreePointArc((160.104656393, -11.04), (160.104656393, -12.96), (158.441887617, -13.92))
        make_face(mode=Mode.SUBTRACT)
    # profile 30 of 31: a face of its own
    with BuildSketch(Plane.XY):
        with BuildLine():
            ThreePointArc((60.292341855, -12), (60.878128293, -13.414213562), (62.292341855, -14))
            Line((62.292341855, -14), (66.065844547, -14))
            ThreePointArc((66.065844547, -14), (67.797895355, -13), (67.797895355, -11))
            Line((67.797895355, -11), (64.024392663, -4.464101615))
            ThreePointArc((64.024392663, -4.464101615), (61.774703765, -3.532249963), (60.292341855, -5.464101615))
            Line((60.292341855, -5.464101615), (60.292341855, -12))
        make_face()
        with BuildLine():
            Line((66.065844547, -13.92), (62.292341855, -13.92))
            ThreePointArc((62.292341855, -13.92), (60.934696835, -13.35764502), (60.372341855, -12))
            Line((60.372341855, -12), (60.372341855, -5.464101615))
            ThreePointArc((60.372341855, -5.464101615), (61.795409288, -3.609524029), (63.95511063, -4.504101615))
            Line((63.95511063, -4.504101615), (67.728613322, -11.04))
            ThreePointArc((67.728613322, -11.04), (67.728613322, -12.96), (66.065844547, -13.92))
        make_face(mode=Mode.SUBTRACT)
    # profile 31 of 31: a face of its own
    with BuildSketch(Plane.XY):
        with BuildLine():
            ThreePointArc((177.494446501, -11), (177.494446501, -13), (179.226497308, -14))
            Line((179.226497308, -14), (183, -14))
            ThreePointArc((183, -14), (184.414213562, -13.414213562), (185, -12))
            Line((185, -12), (185, -5.464101615))
            ThreePointArc((185, -5.464101615), (183.51763809, -3.532249963), (181.267949192, -4.464101615))
            Line((181.267949192, -4.464101615), (177.494446501, -11))
        make_face()
        with BuildLine():
            Line((183, -13.92), (179.226497308, -13.92))
            ThreePointArc((179.226497308, -13.92), (177.563728533, -12.96), (177.563728533, -11.04))
            Line((177.563728533, -11.04), (181.337231225, -4.504101615))
            ThreePointArc((181.337231225, -4.504101615), (183.496932567, -3.609524029), (184.92, -5.464101615))
            Line((184.92, -5.464101615), (184.92, -12))
            ThreePointArc((184.92, -12), (184.35764502, -13.35764502), (183, -13.92))
        make_face(mode=Mode.SUBTRACT)
    extrude(amount=MOVE_FACE1_DEPTH)

    # Move Face1 2 outline → Move Face1 2 (add)
    with BuildSketch(Plane.XY):
        with BuildLine():
            ThreePointArc((18.303717078, -57.223949018), (24.765532994, -54.738238697), (30.898474654, -51.525631138))
            ThreePointArc((30.898474654, -51.525631138), (30.636086216, -51.658716096), (30.357545289, -51.753448619))
            ThreePointArc((30.357545289, -51.753448619), (24.636838099, -54.708556994), (18.632402432, -57.033617977))
            ThreePointArc((18.632402432, -57.033617977), (18.468759809, -57.129992431), (18.303717078, -57.223949018))
        make_face()
        with BuildLine():
            ThreePointArc((28.034815058, -26), (28.176438365, -25.940357257), (28.328753827, -25.92))
            Line((28.328753827, -25.92), (24.328753827, -25.92))
            ThreePointArc((24.328753827, -25.92), (24.481069289, -25.940357257), (24.622692596, -26))
            Line((24.622692596, -26), (28.034815058, -26))
        make_face()
    extrude(amount=MOVE_FACE1_2_DEPTH)


solid = part.part
